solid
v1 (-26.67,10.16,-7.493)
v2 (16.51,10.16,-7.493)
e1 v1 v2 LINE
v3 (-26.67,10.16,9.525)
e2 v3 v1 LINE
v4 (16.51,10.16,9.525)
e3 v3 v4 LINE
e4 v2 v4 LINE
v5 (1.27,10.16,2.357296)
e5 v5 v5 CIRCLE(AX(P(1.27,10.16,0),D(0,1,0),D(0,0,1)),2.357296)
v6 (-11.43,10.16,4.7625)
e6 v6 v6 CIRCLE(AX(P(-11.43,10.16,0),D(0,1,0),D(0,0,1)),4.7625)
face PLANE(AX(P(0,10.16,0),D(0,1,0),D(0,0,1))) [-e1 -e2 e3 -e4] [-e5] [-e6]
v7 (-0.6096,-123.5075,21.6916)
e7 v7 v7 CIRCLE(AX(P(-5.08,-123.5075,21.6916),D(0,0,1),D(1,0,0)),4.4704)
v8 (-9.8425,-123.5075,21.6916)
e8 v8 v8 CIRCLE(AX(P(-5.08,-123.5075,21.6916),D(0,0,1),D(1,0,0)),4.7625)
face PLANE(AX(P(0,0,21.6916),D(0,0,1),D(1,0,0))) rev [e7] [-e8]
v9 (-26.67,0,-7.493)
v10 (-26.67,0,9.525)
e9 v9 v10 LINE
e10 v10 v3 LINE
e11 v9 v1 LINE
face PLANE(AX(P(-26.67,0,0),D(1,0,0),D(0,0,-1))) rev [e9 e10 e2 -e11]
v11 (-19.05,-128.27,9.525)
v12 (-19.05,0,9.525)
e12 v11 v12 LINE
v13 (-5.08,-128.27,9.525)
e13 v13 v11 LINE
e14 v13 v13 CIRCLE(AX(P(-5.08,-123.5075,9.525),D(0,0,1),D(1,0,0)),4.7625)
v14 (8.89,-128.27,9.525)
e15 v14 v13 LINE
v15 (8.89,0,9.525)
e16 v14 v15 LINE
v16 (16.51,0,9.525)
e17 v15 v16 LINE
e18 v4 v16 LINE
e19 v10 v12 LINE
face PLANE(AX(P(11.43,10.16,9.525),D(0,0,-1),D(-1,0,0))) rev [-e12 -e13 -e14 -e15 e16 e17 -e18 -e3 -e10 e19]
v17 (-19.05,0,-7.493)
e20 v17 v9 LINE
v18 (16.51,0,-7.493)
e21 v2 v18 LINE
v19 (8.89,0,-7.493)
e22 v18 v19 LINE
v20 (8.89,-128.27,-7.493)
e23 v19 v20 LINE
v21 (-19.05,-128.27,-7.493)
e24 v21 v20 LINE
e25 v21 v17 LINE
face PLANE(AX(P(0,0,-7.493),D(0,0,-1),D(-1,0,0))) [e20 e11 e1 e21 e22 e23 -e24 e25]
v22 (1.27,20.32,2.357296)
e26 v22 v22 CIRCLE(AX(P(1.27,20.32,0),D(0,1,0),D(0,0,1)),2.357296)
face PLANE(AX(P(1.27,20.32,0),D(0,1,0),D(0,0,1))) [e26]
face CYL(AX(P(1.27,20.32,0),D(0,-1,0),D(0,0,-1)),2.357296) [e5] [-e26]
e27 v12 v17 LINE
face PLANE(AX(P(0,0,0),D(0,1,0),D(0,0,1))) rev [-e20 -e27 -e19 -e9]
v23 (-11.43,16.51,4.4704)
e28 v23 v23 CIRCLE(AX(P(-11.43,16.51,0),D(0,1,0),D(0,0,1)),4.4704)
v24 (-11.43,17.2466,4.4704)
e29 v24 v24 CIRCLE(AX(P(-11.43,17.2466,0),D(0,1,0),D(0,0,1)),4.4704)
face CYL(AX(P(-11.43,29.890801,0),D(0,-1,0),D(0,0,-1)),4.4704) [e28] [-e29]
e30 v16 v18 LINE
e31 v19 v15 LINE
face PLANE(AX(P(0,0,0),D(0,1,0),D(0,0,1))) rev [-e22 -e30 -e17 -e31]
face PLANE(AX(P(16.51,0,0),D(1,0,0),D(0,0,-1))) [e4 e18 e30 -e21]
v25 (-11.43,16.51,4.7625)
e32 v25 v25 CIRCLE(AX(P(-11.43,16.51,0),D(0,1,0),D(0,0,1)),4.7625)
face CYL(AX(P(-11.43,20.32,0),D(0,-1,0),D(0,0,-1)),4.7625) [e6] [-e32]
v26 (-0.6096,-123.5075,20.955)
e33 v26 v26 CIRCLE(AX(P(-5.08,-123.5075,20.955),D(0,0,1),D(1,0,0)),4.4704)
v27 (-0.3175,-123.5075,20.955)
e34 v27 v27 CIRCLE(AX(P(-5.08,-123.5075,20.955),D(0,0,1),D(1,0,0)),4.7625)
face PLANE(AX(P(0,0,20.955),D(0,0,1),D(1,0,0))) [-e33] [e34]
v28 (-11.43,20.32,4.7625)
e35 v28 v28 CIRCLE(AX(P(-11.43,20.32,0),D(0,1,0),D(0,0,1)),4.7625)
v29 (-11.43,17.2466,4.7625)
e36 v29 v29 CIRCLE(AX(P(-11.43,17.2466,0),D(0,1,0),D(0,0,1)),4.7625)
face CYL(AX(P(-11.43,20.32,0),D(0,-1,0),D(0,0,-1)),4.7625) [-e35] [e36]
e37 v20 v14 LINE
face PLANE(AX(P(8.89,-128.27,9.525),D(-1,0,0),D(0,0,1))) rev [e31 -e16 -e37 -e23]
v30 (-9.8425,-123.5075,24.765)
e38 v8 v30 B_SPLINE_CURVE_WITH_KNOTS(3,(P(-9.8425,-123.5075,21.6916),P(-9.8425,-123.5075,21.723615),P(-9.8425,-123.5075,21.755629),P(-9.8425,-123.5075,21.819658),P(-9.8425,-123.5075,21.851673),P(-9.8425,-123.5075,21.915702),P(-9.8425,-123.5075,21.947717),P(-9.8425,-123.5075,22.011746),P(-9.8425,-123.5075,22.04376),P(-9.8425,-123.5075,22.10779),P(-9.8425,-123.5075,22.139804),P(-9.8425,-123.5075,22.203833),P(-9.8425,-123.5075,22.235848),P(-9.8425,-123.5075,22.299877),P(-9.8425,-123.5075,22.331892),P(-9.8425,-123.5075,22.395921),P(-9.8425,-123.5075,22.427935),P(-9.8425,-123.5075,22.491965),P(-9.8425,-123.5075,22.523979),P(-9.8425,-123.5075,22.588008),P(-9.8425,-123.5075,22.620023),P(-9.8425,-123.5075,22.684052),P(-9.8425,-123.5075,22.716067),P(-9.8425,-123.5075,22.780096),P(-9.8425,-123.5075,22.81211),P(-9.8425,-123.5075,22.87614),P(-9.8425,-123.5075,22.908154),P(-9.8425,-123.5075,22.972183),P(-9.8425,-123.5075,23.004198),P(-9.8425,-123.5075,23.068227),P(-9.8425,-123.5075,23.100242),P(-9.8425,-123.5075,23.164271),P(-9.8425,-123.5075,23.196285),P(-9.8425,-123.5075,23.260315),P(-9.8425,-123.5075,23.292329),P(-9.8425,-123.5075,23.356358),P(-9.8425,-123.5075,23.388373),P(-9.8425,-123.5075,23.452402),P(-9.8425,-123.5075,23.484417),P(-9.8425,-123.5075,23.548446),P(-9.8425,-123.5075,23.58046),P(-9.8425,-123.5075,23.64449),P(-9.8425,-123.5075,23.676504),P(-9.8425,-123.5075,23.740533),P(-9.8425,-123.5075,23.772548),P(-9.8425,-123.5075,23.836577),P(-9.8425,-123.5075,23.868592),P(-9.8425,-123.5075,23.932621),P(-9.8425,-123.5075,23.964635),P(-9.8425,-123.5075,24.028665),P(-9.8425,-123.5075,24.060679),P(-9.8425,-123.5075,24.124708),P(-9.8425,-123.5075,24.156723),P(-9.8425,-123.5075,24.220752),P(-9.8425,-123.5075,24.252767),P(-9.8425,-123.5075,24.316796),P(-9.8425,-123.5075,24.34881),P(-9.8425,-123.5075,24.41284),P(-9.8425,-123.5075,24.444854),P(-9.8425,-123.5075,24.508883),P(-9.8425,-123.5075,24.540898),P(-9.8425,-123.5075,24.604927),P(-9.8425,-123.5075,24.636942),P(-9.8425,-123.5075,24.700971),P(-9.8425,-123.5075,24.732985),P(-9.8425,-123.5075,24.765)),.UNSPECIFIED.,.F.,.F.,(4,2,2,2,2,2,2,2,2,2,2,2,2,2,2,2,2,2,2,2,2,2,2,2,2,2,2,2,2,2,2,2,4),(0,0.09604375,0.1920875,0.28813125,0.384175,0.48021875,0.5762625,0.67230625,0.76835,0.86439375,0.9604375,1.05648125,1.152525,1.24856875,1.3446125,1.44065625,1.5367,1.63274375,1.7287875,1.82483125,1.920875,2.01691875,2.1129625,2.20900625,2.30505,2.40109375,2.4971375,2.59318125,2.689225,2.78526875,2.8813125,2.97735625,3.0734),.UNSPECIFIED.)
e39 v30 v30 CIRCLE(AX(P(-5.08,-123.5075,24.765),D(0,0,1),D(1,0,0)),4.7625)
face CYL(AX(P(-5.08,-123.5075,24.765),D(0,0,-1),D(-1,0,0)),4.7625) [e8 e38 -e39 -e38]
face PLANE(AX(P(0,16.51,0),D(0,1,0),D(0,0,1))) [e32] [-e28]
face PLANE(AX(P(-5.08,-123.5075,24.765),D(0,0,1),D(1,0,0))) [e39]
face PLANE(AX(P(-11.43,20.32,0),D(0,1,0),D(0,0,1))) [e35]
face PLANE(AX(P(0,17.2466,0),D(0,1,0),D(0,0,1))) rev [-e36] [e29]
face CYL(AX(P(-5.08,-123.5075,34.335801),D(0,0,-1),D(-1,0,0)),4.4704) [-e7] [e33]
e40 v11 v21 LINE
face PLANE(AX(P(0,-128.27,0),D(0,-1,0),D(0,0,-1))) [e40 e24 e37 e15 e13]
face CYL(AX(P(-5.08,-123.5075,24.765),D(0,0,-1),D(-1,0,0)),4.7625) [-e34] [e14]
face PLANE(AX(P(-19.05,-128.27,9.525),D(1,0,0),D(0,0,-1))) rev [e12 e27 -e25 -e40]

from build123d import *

# Parameters (mm, degrees)
SKETCH1_W              = 33.02
SKETCH1_H              = 19.05
BOSS_EXTRUDE1_DEPTH    = 10.16
SKETCH2_R              = 4.7625
SKETCH2_R_2            = 2.357295936
BOSS_EXTRUDE2_DEPTH    = 10.16
SKETCH5_W              = 19.05
SKETCH5_H              = 10.16
BOSS_EXTRUDE3_DEPTH    = 5.08
SKETCH6_W              = 19.05
SKETCH6_H              = 10.16
BOSS_EXTRUDE4_DEPTH    = 5.08
SKETCH7_W              = 27.94
SKETCH7_H              = 19.05
BOSS_EXTRUDE5_DEPTH    = 128.27
SKETCH9_R              = 4.7625
BOSS_EXTRUDE6_DEPTH    = 15.24
SKETCH10_W             = 43.18
SKETCH10_H             = 138.43
CUT_EXTRUDE1_DEPTH     = 2.032
CUT_EXTRUDE2_START     = 20.955
CUT_EXTRUDE2_OUTLINE_R = 4.7625
CUT_EXTRUDE2_DEPTH     = 0.7366
SKETCH11_R             = 4.4704
BOSS_EXTRUDE7_DEPTH    = 0.7366
CUT_EXTRUDE3_START     = 16.51
CUT_EXTRUDE3_OUTLINE_R = 4.7625
CUT_EXTRUDE3_DEPTH     = 0.7366
SKETCH12_R             = 4.4704
BOSS_EXTRUDE8_DEPTH    = 0.7366


# Read off the part's stored shape, not the designer's step: Cut-Extrude2, Cut-Extrude3
with BuildPart() as part:
    # Sketch1 → Boss-Extrude1 (new body)
    with BuildSketch(Plane(origin=(0, 0, 0), x_dir=(1, 0, 0), z_dir=(0, 1, 0))):
        with Locations((-5.08, 0)):
            Rectangle(SKETCH1_W, SKETCH1_H)
    extrude(amount=BOSS_EXTRUDE1_DEPTH)

    # Sketch2 → Boss-Extrude2 (add)
    with BuildSketch(Plane(origin=(0, 10.16, 0), x_dir=(1, 0, 0), z_dir=(0, 1, 0))):
        with Locations(Location((-11.43, 0, 0), (0, 0, 270))):
            Circle(SKETCH2_R)
        with Locations(Location((1.27, 0, 0), (0, 0, 270))):
            Circle(SKETCH2_R_2)
    extrude(amount=BOSS_EXTRUDE2_DEPTH)

    # Sketch5 → Boss-Extrude3 (add)
    with BuildSketch(Plane.ZY.offset(21.59)):
        with Locations((0, 5.08)):
            Rectangle(SKETCH5_W, SKETCH5_H)
    extrude(amount=BOSS_EXTRUDE3_DEPTH)

    # Sketch6 → Boss-Extrude4 (add)
    with BuildSketch(Plane(origin=(11.43, 0, 0), x_dir=(0, 0, -1), z_dir=(1, 0, 0))):
        with Locations((0, 5.08)):
            Rectangle(SKETCH6_W, SKETCH6_H)
    extrude(amount=BOSS_EXTRUDE4_DEPTH)

    # Sketch7 → Boss-Extrude5 (add)
    with BuildSketch(Plane(origin=(0, 0, 0), x_dir=(-1, 0, 0), z_dir=(0, -1, 0))):
        with Locations((5.08, 0)):
            Rectangle(SKETCH7_W, SKETCH7_H)
    extrude(amount=BOSS_EXTRUDE5_DEPTH)

    # Sketch9 → Boss-Extrude6 (add)
    with BuildSketch(Plane.XY.offset(9.525)):
        with Locations(Location((-5.08, -123.5075, 0), (0, 0, 270))):
            Circle(SKETCH9_R)
    extrude(amount=BOSS_EXTRUDE6_DEPTH)

    # Sketch10 → Cut-Extrude1 (cut)
    with BuildSketch(Plane(origin=(0, 0, -9.525), x_dir=(-1, 0, 0), z_dir=(0, 0, -1))):
        with Locations((5.08, -59.055)):
            Rectangle(SKETCH10_W, SKETCH10_H)
    extrude(amount=-CUT_EXTRUDE1_DEPTH, mode=Mode.SUBTRACT)

    # Cut-Extrude2 outline → Cut-Extrude2 (cut)
    with BuildSketch(Plane.XY.offset(CUT_EXTRUDE2_START)):
        with Locations((-5.08, -123.5075)):
            Circle(CUT_EXTRUDE2_OUTLINE_R)
    extrude(amount=CUT_EXTRUDE2_DEPTH, mode=Mode.SUBTRACT)

    # Sketch11 → Boss-Extrude7 (add)
    with BuildSketch(Plane.XY.offset(20.955)):
        with Locations((-5.08, -123.5075)):
            Circle(SKETCH11_R)
    extrude(amount=BOSS_EXTRUDE7_DEPTH)

    # Cut-Extrude3 outline → Cut-Extrude3 (cut)
    with BuildSketch(Plane(origin=(0, 0, 0), x_dir=(1, 0, 0), z_dir=(0, 1, 0)).offset(CUT_EXTRUDE3_START)):
        with Locations((-11.43, 0)):
            Circle(CUT_EXTRUDE3_OUTLINE_R)
    extrude(amount=CUT_EXTRUDE3_DEPTH, mode=Mode.SUBTRACT)

    # Sketch12 → Boss-Extrude8 (add)
    with BuildSketch(Plane(origin=(0, 16.51, 0), x_dir=(1, 0, 0), z_dir=(0, 1, 0))):
        with Locations(Location((-11.43, 0, 0), (0, 0, 270))):
            Circle(SKETCH12_R)
    extrude(amount=BOSS_EXTRUDE8_DEPTH)


solid = part.part
